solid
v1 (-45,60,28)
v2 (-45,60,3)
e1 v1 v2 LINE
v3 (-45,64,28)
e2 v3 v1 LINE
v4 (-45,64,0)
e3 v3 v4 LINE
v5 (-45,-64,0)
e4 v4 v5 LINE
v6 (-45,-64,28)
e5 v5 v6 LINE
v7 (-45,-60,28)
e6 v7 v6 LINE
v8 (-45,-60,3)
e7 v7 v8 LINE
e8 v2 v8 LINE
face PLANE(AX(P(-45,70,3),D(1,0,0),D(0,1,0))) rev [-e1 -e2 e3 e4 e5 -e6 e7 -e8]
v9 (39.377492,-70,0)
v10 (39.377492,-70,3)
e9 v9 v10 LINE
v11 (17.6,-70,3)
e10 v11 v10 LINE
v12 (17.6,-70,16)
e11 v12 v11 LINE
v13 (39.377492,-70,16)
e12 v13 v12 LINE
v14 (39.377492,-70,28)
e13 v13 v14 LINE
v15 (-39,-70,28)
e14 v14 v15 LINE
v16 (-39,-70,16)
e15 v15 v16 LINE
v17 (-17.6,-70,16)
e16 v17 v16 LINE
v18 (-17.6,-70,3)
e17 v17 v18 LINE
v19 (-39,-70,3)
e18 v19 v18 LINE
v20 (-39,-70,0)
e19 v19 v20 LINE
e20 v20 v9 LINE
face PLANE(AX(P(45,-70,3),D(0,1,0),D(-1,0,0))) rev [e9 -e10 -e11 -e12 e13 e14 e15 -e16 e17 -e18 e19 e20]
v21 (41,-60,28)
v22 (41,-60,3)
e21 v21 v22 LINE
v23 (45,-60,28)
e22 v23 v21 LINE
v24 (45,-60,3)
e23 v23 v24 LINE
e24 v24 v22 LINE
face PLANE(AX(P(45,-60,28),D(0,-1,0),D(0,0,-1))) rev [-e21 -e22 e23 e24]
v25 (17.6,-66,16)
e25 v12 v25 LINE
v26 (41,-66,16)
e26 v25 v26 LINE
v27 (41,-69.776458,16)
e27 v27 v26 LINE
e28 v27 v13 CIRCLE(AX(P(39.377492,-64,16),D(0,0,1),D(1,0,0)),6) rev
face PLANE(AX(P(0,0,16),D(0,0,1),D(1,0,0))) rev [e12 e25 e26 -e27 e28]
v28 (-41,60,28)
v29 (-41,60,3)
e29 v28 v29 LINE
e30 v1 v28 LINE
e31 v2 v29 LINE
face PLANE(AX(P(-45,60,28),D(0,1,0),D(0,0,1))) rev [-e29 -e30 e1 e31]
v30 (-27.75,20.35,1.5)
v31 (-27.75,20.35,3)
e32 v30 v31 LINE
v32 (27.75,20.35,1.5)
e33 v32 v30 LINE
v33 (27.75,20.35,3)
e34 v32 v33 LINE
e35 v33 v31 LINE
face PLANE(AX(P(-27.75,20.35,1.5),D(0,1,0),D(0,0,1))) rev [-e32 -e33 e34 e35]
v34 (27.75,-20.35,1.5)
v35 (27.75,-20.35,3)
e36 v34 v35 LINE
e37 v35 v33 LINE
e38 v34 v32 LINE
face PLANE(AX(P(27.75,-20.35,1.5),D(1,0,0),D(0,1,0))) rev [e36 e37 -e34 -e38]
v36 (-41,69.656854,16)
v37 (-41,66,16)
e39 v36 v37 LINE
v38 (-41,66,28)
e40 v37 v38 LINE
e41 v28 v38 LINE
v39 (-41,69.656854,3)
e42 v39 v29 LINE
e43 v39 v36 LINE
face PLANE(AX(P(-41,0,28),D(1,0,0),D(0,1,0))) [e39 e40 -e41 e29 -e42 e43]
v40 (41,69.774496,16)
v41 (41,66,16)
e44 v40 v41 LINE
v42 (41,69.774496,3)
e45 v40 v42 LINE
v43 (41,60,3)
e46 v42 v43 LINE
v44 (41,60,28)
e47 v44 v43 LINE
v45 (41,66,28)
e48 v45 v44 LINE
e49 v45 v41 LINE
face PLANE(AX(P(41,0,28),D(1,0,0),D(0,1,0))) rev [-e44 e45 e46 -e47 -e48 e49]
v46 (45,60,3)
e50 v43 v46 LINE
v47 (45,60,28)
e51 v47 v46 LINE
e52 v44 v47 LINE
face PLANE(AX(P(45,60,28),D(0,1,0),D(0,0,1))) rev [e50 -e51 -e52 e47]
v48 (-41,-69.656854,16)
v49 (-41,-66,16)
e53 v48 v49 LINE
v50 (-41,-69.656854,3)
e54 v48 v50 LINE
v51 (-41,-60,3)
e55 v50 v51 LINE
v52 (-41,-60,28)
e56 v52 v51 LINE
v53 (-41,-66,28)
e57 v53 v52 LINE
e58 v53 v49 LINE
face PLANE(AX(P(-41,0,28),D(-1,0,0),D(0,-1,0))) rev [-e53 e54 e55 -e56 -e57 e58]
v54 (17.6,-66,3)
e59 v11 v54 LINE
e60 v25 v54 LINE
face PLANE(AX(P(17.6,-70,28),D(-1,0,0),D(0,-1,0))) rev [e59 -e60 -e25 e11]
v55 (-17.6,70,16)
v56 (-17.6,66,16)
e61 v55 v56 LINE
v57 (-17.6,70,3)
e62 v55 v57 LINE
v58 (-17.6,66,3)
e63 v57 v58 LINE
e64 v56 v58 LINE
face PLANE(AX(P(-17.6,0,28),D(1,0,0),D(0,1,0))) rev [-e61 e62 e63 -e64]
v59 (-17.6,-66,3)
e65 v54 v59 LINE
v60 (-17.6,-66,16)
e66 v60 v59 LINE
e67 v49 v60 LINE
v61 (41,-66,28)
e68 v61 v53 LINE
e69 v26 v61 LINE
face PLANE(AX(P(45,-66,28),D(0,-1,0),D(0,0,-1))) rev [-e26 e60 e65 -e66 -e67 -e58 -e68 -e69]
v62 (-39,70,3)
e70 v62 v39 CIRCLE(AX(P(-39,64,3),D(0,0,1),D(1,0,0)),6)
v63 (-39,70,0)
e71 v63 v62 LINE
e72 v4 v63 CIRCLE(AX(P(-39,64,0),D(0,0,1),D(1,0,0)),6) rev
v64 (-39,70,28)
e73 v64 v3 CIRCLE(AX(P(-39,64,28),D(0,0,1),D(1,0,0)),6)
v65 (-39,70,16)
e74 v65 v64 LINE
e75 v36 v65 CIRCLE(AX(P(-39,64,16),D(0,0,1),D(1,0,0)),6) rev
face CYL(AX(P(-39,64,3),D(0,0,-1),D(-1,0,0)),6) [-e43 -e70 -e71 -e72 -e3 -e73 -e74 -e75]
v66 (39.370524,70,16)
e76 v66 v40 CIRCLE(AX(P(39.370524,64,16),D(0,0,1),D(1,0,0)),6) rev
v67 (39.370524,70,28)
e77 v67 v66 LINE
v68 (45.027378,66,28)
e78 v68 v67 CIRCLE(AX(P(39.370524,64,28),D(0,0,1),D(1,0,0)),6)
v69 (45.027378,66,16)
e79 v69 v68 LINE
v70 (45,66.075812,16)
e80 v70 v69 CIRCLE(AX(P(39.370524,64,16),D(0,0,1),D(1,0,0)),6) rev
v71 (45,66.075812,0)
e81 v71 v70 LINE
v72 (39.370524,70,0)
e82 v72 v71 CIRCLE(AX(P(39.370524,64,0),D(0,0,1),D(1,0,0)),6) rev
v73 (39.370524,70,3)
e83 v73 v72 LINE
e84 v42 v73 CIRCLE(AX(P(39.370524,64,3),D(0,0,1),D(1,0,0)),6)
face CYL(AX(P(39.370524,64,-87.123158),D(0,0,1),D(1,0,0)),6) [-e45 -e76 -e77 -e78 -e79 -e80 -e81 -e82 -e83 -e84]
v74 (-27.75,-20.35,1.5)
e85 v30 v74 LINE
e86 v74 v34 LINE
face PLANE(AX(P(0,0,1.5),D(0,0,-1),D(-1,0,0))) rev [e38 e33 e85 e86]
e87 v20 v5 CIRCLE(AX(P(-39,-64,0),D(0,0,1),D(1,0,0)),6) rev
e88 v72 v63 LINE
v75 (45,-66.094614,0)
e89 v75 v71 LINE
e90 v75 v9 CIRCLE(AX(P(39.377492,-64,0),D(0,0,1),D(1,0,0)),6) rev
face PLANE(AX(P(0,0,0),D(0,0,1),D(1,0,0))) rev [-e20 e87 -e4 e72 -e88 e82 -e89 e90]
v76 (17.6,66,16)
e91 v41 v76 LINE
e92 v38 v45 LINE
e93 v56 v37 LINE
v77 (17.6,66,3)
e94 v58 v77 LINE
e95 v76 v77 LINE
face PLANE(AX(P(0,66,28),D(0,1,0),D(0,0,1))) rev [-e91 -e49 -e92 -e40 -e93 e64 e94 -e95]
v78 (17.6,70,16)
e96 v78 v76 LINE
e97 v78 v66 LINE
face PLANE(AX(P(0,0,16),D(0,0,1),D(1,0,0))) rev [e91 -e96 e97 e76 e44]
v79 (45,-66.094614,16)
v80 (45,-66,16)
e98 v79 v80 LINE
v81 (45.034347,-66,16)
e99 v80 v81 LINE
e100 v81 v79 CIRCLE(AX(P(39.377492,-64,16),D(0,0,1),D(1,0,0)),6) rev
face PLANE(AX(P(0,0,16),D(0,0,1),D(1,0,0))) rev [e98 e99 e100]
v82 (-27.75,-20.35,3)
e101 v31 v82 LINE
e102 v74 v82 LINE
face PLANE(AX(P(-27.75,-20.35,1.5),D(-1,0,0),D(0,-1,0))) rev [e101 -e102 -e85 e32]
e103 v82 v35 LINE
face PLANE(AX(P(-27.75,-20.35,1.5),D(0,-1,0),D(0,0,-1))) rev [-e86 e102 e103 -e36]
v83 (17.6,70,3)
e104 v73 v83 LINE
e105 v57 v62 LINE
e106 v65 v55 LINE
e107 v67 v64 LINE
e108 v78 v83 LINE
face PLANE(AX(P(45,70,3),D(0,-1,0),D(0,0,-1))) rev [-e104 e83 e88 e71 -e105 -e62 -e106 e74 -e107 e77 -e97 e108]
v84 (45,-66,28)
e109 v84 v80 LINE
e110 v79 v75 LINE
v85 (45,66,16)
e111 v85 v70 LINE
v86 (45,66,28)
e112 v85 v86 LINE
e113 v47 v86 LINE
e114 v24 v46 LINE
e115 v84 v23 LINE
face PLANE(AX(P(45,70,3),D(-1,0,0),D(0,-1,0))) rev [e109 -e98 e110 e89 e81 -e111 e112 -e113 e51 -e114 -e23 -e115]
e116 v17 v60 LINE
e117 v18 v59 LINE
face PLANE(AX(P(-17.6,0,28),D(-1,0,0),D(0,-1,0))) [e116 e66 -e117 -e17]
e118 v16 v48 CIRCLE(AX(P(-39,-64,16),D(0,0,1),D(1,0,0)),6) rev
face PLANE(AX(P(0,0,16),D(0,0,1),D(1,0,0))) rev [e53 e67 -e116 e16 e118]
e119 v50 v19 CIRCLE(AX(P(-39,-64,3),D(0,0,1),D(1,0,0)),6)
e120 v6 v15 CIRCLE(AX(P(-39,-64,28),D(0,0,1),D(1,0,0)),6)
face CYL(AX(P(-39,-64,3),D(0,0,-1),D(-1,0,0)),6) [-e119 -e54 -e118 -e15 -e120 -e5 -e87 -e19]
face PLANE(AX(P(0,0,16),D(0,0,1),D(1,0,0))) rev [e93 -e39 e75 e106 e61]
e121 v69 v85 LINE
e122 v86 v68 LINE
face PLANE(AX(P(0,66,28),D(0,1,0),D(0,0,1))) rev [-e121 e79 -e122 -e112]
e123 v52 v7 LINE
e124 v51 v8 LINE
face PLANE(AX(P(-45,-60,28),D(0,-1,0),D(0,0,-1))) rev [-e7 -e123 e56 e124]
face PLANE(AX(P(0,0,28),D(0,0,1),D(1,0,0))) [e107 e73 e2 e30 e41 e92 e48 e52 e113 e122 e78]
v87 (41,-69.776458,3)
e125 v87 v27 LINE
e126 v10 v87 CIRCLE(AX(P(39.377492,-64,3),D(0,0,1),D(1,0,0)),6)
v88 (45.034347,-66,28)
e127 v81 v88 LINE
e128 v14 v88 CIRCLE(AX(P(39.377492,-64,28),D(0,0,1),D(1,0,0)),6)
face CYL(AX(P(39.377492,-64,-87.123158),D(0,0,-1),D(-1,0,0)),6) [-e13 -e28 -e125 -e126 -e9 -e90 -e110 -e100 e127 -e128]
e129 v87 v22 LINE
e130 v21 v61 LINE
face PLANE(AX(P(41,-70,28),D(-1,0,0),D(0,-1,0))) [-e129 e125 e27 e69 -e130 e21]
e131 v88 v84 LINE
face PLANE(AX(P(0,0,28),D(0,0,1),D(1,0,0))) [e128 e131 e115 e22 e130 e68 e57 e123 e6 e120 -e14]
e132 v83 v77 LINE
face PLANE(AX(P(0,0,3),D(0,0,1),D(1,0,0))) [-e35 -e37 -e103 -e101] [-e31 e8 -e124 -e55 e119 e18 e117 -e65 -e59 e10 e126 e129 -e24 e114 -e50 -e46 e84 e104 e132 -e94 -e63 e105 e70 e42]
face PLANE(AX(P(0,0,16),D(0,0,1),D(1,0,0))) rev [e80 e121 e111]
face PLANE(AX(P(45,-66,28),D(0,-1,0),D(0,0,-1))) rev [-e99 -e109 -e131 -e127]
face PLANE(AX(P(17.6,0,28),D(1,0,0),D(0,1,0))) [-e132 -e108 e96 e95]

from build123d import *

# Parameters (mm, degrees)
SKETCH1_W           = 140
SKETCH1_H           = 90
BOSS_EXTRUDE1_DEPTH = 3
SKETCH2_W           = 4
SKETCH2_H           = 4
SKETCH2_W_2         = 35.2
BOSS_EXTRUDE2_DEPTH = 25
SKETCH4_W           = 55.5
SKETCH4_H           = 40.7
CUT_EXTRUDE1_DEPTH  = 1.5
SKETCH5_W           = 90.034346747
SKETCH5_H           = 4
SKETCH5_W_2         = 90.027377931
BOSS_EXTRUDE3_DEPTH = 12
SKETCH8_W           = 4
SKETCH8_H           = 10
BOSS_EXTRUDE5_DEPTH = 25
FILLET1_START       = -1
FILLET1_DEPTH       = 29


with BuildPart() as part:
    # Sketch1 → Boss-Extrude1 (new body)
    with BuildSketch(Plane(origin=(0, 0, 0), x_dir=(0, 1, 0), z_dir=(0, 0, 1))):
        Rectangle(SKETCH1_W, SKETCH1_H)
    extrude(amount=BOSS_EXTRUDE1_DEPTH)

    # Sketch2 → Boss-Extrude2 (add)
    with BuildSketch(Plane.XY.offset(3)):
        with Locations((-43, 68)):
            Rectangle(SKETCH2_W, SKETCH2_H)
        with Locations((43, 68)):
            Rectangle(SKETCH2_W, SKETCH2_H)
        with Locations((43, -68)):
            Rectangle(SKETCH2_W, SKETCH2_H)
        with Locations((-43, -68)):
            Rectangle(SKETCH2_W, SKETCH2_H)
        with Locations((0, 68)):
            Rectangle(SKETCH2_W_2, SKETCH2_H)
        with Locations((0, -68)):
            Rectangle(SKETCH2_W_2, SKETCH2_H)
    extrude(amount=BOSS_EXTRUDE2_DEPTH)

    # Sketch4 → Cut-Extrude1 (cut)
    with BuildSketch(Plane.XY.offset(3)):
        Rectangle(SKETCH4_W, SKETCH4_H)
    extrude(amount=-CUT_EXTRUDE1_DEPTH, mode=Mode.SUBTRACT)

    # Sketch5 → Boss-Extrude3 (add)
    with BuildSketch(Plane.XY.offset(28)):
        with Locations((0.017173374, -68)):
            Rectangle(SKETCH5_W, SKETCH5_H)
        with Locations((0.013688966, 68)):
            Rectangle(SKETCH5_W_2, SKETCH5_H)
    extrude(amount=-BOSS_EXTRUDE3_DEPTH)

    # Sketch8 → Boss-Extrude5 (add, through all)
    with BuildSketch(Plane.XY.offset(3)):
        with Locations((-43, 65)):
            Rectangle(SKETCH8_W, SKETCH8_H)
        with Locations((43, 65)):
            Rectangle(SKETCH8_W, SKETCH8_H)
        with Locations((43, -65)):
            Rectangle(SKETCH8_W, SKETCH8_H)
        with Locations((-43, -65)):
            Rectangle(SKETCH8_W, SKETCH8_H)
    extrude(amount=BOSS_EXTRUDE5_DEPTH)

    # Fillet1: read off the stored shape, not the designer's step
    # Fillet1 outline → Fillet1 (cut)
    with BuildSketch(Plane.XY.offset(FILLET1_START)):
        with BuildLine():
            Line((45.027377931, 66), (45.027377931, 70))
            Line((45.027377931, 70), (39.370523681, 70))
            ThreePointArc((39.370523681, 70), (42.834625296, 68.898979486), (45.027377931, 66))
        make_face()
        with BuildLine():
            Line((45.034346747, -70), (45.034346747, -66))
            ThreePointArc((45.034346747, -66), (42.841594113, -68.898979486), (39.377492498, -70))
            Line((39.377492498, -70), (45.034346747, -70))
        make_face()
        with BuildLine():
            Line((-39, 70), (-45, 70))
            Line((-45, 70), (-45, 64))
            ThreePointArc((-45, 64), (-43.242640687, 68.242640687), (-39, 70))
        make_face()
        with BuildLine():
            ThreePointArc((-39, -70), (-43.242640687, -68.242640687), (-45, -64))
            Line((-45, -64), (-45, -70))
            Line((-45, -70), (-39, -70))
        make_face()
    extrude(amount=FILLET1_DEPTH, mode=Mode.SUBTRACT)


solid = part.part
